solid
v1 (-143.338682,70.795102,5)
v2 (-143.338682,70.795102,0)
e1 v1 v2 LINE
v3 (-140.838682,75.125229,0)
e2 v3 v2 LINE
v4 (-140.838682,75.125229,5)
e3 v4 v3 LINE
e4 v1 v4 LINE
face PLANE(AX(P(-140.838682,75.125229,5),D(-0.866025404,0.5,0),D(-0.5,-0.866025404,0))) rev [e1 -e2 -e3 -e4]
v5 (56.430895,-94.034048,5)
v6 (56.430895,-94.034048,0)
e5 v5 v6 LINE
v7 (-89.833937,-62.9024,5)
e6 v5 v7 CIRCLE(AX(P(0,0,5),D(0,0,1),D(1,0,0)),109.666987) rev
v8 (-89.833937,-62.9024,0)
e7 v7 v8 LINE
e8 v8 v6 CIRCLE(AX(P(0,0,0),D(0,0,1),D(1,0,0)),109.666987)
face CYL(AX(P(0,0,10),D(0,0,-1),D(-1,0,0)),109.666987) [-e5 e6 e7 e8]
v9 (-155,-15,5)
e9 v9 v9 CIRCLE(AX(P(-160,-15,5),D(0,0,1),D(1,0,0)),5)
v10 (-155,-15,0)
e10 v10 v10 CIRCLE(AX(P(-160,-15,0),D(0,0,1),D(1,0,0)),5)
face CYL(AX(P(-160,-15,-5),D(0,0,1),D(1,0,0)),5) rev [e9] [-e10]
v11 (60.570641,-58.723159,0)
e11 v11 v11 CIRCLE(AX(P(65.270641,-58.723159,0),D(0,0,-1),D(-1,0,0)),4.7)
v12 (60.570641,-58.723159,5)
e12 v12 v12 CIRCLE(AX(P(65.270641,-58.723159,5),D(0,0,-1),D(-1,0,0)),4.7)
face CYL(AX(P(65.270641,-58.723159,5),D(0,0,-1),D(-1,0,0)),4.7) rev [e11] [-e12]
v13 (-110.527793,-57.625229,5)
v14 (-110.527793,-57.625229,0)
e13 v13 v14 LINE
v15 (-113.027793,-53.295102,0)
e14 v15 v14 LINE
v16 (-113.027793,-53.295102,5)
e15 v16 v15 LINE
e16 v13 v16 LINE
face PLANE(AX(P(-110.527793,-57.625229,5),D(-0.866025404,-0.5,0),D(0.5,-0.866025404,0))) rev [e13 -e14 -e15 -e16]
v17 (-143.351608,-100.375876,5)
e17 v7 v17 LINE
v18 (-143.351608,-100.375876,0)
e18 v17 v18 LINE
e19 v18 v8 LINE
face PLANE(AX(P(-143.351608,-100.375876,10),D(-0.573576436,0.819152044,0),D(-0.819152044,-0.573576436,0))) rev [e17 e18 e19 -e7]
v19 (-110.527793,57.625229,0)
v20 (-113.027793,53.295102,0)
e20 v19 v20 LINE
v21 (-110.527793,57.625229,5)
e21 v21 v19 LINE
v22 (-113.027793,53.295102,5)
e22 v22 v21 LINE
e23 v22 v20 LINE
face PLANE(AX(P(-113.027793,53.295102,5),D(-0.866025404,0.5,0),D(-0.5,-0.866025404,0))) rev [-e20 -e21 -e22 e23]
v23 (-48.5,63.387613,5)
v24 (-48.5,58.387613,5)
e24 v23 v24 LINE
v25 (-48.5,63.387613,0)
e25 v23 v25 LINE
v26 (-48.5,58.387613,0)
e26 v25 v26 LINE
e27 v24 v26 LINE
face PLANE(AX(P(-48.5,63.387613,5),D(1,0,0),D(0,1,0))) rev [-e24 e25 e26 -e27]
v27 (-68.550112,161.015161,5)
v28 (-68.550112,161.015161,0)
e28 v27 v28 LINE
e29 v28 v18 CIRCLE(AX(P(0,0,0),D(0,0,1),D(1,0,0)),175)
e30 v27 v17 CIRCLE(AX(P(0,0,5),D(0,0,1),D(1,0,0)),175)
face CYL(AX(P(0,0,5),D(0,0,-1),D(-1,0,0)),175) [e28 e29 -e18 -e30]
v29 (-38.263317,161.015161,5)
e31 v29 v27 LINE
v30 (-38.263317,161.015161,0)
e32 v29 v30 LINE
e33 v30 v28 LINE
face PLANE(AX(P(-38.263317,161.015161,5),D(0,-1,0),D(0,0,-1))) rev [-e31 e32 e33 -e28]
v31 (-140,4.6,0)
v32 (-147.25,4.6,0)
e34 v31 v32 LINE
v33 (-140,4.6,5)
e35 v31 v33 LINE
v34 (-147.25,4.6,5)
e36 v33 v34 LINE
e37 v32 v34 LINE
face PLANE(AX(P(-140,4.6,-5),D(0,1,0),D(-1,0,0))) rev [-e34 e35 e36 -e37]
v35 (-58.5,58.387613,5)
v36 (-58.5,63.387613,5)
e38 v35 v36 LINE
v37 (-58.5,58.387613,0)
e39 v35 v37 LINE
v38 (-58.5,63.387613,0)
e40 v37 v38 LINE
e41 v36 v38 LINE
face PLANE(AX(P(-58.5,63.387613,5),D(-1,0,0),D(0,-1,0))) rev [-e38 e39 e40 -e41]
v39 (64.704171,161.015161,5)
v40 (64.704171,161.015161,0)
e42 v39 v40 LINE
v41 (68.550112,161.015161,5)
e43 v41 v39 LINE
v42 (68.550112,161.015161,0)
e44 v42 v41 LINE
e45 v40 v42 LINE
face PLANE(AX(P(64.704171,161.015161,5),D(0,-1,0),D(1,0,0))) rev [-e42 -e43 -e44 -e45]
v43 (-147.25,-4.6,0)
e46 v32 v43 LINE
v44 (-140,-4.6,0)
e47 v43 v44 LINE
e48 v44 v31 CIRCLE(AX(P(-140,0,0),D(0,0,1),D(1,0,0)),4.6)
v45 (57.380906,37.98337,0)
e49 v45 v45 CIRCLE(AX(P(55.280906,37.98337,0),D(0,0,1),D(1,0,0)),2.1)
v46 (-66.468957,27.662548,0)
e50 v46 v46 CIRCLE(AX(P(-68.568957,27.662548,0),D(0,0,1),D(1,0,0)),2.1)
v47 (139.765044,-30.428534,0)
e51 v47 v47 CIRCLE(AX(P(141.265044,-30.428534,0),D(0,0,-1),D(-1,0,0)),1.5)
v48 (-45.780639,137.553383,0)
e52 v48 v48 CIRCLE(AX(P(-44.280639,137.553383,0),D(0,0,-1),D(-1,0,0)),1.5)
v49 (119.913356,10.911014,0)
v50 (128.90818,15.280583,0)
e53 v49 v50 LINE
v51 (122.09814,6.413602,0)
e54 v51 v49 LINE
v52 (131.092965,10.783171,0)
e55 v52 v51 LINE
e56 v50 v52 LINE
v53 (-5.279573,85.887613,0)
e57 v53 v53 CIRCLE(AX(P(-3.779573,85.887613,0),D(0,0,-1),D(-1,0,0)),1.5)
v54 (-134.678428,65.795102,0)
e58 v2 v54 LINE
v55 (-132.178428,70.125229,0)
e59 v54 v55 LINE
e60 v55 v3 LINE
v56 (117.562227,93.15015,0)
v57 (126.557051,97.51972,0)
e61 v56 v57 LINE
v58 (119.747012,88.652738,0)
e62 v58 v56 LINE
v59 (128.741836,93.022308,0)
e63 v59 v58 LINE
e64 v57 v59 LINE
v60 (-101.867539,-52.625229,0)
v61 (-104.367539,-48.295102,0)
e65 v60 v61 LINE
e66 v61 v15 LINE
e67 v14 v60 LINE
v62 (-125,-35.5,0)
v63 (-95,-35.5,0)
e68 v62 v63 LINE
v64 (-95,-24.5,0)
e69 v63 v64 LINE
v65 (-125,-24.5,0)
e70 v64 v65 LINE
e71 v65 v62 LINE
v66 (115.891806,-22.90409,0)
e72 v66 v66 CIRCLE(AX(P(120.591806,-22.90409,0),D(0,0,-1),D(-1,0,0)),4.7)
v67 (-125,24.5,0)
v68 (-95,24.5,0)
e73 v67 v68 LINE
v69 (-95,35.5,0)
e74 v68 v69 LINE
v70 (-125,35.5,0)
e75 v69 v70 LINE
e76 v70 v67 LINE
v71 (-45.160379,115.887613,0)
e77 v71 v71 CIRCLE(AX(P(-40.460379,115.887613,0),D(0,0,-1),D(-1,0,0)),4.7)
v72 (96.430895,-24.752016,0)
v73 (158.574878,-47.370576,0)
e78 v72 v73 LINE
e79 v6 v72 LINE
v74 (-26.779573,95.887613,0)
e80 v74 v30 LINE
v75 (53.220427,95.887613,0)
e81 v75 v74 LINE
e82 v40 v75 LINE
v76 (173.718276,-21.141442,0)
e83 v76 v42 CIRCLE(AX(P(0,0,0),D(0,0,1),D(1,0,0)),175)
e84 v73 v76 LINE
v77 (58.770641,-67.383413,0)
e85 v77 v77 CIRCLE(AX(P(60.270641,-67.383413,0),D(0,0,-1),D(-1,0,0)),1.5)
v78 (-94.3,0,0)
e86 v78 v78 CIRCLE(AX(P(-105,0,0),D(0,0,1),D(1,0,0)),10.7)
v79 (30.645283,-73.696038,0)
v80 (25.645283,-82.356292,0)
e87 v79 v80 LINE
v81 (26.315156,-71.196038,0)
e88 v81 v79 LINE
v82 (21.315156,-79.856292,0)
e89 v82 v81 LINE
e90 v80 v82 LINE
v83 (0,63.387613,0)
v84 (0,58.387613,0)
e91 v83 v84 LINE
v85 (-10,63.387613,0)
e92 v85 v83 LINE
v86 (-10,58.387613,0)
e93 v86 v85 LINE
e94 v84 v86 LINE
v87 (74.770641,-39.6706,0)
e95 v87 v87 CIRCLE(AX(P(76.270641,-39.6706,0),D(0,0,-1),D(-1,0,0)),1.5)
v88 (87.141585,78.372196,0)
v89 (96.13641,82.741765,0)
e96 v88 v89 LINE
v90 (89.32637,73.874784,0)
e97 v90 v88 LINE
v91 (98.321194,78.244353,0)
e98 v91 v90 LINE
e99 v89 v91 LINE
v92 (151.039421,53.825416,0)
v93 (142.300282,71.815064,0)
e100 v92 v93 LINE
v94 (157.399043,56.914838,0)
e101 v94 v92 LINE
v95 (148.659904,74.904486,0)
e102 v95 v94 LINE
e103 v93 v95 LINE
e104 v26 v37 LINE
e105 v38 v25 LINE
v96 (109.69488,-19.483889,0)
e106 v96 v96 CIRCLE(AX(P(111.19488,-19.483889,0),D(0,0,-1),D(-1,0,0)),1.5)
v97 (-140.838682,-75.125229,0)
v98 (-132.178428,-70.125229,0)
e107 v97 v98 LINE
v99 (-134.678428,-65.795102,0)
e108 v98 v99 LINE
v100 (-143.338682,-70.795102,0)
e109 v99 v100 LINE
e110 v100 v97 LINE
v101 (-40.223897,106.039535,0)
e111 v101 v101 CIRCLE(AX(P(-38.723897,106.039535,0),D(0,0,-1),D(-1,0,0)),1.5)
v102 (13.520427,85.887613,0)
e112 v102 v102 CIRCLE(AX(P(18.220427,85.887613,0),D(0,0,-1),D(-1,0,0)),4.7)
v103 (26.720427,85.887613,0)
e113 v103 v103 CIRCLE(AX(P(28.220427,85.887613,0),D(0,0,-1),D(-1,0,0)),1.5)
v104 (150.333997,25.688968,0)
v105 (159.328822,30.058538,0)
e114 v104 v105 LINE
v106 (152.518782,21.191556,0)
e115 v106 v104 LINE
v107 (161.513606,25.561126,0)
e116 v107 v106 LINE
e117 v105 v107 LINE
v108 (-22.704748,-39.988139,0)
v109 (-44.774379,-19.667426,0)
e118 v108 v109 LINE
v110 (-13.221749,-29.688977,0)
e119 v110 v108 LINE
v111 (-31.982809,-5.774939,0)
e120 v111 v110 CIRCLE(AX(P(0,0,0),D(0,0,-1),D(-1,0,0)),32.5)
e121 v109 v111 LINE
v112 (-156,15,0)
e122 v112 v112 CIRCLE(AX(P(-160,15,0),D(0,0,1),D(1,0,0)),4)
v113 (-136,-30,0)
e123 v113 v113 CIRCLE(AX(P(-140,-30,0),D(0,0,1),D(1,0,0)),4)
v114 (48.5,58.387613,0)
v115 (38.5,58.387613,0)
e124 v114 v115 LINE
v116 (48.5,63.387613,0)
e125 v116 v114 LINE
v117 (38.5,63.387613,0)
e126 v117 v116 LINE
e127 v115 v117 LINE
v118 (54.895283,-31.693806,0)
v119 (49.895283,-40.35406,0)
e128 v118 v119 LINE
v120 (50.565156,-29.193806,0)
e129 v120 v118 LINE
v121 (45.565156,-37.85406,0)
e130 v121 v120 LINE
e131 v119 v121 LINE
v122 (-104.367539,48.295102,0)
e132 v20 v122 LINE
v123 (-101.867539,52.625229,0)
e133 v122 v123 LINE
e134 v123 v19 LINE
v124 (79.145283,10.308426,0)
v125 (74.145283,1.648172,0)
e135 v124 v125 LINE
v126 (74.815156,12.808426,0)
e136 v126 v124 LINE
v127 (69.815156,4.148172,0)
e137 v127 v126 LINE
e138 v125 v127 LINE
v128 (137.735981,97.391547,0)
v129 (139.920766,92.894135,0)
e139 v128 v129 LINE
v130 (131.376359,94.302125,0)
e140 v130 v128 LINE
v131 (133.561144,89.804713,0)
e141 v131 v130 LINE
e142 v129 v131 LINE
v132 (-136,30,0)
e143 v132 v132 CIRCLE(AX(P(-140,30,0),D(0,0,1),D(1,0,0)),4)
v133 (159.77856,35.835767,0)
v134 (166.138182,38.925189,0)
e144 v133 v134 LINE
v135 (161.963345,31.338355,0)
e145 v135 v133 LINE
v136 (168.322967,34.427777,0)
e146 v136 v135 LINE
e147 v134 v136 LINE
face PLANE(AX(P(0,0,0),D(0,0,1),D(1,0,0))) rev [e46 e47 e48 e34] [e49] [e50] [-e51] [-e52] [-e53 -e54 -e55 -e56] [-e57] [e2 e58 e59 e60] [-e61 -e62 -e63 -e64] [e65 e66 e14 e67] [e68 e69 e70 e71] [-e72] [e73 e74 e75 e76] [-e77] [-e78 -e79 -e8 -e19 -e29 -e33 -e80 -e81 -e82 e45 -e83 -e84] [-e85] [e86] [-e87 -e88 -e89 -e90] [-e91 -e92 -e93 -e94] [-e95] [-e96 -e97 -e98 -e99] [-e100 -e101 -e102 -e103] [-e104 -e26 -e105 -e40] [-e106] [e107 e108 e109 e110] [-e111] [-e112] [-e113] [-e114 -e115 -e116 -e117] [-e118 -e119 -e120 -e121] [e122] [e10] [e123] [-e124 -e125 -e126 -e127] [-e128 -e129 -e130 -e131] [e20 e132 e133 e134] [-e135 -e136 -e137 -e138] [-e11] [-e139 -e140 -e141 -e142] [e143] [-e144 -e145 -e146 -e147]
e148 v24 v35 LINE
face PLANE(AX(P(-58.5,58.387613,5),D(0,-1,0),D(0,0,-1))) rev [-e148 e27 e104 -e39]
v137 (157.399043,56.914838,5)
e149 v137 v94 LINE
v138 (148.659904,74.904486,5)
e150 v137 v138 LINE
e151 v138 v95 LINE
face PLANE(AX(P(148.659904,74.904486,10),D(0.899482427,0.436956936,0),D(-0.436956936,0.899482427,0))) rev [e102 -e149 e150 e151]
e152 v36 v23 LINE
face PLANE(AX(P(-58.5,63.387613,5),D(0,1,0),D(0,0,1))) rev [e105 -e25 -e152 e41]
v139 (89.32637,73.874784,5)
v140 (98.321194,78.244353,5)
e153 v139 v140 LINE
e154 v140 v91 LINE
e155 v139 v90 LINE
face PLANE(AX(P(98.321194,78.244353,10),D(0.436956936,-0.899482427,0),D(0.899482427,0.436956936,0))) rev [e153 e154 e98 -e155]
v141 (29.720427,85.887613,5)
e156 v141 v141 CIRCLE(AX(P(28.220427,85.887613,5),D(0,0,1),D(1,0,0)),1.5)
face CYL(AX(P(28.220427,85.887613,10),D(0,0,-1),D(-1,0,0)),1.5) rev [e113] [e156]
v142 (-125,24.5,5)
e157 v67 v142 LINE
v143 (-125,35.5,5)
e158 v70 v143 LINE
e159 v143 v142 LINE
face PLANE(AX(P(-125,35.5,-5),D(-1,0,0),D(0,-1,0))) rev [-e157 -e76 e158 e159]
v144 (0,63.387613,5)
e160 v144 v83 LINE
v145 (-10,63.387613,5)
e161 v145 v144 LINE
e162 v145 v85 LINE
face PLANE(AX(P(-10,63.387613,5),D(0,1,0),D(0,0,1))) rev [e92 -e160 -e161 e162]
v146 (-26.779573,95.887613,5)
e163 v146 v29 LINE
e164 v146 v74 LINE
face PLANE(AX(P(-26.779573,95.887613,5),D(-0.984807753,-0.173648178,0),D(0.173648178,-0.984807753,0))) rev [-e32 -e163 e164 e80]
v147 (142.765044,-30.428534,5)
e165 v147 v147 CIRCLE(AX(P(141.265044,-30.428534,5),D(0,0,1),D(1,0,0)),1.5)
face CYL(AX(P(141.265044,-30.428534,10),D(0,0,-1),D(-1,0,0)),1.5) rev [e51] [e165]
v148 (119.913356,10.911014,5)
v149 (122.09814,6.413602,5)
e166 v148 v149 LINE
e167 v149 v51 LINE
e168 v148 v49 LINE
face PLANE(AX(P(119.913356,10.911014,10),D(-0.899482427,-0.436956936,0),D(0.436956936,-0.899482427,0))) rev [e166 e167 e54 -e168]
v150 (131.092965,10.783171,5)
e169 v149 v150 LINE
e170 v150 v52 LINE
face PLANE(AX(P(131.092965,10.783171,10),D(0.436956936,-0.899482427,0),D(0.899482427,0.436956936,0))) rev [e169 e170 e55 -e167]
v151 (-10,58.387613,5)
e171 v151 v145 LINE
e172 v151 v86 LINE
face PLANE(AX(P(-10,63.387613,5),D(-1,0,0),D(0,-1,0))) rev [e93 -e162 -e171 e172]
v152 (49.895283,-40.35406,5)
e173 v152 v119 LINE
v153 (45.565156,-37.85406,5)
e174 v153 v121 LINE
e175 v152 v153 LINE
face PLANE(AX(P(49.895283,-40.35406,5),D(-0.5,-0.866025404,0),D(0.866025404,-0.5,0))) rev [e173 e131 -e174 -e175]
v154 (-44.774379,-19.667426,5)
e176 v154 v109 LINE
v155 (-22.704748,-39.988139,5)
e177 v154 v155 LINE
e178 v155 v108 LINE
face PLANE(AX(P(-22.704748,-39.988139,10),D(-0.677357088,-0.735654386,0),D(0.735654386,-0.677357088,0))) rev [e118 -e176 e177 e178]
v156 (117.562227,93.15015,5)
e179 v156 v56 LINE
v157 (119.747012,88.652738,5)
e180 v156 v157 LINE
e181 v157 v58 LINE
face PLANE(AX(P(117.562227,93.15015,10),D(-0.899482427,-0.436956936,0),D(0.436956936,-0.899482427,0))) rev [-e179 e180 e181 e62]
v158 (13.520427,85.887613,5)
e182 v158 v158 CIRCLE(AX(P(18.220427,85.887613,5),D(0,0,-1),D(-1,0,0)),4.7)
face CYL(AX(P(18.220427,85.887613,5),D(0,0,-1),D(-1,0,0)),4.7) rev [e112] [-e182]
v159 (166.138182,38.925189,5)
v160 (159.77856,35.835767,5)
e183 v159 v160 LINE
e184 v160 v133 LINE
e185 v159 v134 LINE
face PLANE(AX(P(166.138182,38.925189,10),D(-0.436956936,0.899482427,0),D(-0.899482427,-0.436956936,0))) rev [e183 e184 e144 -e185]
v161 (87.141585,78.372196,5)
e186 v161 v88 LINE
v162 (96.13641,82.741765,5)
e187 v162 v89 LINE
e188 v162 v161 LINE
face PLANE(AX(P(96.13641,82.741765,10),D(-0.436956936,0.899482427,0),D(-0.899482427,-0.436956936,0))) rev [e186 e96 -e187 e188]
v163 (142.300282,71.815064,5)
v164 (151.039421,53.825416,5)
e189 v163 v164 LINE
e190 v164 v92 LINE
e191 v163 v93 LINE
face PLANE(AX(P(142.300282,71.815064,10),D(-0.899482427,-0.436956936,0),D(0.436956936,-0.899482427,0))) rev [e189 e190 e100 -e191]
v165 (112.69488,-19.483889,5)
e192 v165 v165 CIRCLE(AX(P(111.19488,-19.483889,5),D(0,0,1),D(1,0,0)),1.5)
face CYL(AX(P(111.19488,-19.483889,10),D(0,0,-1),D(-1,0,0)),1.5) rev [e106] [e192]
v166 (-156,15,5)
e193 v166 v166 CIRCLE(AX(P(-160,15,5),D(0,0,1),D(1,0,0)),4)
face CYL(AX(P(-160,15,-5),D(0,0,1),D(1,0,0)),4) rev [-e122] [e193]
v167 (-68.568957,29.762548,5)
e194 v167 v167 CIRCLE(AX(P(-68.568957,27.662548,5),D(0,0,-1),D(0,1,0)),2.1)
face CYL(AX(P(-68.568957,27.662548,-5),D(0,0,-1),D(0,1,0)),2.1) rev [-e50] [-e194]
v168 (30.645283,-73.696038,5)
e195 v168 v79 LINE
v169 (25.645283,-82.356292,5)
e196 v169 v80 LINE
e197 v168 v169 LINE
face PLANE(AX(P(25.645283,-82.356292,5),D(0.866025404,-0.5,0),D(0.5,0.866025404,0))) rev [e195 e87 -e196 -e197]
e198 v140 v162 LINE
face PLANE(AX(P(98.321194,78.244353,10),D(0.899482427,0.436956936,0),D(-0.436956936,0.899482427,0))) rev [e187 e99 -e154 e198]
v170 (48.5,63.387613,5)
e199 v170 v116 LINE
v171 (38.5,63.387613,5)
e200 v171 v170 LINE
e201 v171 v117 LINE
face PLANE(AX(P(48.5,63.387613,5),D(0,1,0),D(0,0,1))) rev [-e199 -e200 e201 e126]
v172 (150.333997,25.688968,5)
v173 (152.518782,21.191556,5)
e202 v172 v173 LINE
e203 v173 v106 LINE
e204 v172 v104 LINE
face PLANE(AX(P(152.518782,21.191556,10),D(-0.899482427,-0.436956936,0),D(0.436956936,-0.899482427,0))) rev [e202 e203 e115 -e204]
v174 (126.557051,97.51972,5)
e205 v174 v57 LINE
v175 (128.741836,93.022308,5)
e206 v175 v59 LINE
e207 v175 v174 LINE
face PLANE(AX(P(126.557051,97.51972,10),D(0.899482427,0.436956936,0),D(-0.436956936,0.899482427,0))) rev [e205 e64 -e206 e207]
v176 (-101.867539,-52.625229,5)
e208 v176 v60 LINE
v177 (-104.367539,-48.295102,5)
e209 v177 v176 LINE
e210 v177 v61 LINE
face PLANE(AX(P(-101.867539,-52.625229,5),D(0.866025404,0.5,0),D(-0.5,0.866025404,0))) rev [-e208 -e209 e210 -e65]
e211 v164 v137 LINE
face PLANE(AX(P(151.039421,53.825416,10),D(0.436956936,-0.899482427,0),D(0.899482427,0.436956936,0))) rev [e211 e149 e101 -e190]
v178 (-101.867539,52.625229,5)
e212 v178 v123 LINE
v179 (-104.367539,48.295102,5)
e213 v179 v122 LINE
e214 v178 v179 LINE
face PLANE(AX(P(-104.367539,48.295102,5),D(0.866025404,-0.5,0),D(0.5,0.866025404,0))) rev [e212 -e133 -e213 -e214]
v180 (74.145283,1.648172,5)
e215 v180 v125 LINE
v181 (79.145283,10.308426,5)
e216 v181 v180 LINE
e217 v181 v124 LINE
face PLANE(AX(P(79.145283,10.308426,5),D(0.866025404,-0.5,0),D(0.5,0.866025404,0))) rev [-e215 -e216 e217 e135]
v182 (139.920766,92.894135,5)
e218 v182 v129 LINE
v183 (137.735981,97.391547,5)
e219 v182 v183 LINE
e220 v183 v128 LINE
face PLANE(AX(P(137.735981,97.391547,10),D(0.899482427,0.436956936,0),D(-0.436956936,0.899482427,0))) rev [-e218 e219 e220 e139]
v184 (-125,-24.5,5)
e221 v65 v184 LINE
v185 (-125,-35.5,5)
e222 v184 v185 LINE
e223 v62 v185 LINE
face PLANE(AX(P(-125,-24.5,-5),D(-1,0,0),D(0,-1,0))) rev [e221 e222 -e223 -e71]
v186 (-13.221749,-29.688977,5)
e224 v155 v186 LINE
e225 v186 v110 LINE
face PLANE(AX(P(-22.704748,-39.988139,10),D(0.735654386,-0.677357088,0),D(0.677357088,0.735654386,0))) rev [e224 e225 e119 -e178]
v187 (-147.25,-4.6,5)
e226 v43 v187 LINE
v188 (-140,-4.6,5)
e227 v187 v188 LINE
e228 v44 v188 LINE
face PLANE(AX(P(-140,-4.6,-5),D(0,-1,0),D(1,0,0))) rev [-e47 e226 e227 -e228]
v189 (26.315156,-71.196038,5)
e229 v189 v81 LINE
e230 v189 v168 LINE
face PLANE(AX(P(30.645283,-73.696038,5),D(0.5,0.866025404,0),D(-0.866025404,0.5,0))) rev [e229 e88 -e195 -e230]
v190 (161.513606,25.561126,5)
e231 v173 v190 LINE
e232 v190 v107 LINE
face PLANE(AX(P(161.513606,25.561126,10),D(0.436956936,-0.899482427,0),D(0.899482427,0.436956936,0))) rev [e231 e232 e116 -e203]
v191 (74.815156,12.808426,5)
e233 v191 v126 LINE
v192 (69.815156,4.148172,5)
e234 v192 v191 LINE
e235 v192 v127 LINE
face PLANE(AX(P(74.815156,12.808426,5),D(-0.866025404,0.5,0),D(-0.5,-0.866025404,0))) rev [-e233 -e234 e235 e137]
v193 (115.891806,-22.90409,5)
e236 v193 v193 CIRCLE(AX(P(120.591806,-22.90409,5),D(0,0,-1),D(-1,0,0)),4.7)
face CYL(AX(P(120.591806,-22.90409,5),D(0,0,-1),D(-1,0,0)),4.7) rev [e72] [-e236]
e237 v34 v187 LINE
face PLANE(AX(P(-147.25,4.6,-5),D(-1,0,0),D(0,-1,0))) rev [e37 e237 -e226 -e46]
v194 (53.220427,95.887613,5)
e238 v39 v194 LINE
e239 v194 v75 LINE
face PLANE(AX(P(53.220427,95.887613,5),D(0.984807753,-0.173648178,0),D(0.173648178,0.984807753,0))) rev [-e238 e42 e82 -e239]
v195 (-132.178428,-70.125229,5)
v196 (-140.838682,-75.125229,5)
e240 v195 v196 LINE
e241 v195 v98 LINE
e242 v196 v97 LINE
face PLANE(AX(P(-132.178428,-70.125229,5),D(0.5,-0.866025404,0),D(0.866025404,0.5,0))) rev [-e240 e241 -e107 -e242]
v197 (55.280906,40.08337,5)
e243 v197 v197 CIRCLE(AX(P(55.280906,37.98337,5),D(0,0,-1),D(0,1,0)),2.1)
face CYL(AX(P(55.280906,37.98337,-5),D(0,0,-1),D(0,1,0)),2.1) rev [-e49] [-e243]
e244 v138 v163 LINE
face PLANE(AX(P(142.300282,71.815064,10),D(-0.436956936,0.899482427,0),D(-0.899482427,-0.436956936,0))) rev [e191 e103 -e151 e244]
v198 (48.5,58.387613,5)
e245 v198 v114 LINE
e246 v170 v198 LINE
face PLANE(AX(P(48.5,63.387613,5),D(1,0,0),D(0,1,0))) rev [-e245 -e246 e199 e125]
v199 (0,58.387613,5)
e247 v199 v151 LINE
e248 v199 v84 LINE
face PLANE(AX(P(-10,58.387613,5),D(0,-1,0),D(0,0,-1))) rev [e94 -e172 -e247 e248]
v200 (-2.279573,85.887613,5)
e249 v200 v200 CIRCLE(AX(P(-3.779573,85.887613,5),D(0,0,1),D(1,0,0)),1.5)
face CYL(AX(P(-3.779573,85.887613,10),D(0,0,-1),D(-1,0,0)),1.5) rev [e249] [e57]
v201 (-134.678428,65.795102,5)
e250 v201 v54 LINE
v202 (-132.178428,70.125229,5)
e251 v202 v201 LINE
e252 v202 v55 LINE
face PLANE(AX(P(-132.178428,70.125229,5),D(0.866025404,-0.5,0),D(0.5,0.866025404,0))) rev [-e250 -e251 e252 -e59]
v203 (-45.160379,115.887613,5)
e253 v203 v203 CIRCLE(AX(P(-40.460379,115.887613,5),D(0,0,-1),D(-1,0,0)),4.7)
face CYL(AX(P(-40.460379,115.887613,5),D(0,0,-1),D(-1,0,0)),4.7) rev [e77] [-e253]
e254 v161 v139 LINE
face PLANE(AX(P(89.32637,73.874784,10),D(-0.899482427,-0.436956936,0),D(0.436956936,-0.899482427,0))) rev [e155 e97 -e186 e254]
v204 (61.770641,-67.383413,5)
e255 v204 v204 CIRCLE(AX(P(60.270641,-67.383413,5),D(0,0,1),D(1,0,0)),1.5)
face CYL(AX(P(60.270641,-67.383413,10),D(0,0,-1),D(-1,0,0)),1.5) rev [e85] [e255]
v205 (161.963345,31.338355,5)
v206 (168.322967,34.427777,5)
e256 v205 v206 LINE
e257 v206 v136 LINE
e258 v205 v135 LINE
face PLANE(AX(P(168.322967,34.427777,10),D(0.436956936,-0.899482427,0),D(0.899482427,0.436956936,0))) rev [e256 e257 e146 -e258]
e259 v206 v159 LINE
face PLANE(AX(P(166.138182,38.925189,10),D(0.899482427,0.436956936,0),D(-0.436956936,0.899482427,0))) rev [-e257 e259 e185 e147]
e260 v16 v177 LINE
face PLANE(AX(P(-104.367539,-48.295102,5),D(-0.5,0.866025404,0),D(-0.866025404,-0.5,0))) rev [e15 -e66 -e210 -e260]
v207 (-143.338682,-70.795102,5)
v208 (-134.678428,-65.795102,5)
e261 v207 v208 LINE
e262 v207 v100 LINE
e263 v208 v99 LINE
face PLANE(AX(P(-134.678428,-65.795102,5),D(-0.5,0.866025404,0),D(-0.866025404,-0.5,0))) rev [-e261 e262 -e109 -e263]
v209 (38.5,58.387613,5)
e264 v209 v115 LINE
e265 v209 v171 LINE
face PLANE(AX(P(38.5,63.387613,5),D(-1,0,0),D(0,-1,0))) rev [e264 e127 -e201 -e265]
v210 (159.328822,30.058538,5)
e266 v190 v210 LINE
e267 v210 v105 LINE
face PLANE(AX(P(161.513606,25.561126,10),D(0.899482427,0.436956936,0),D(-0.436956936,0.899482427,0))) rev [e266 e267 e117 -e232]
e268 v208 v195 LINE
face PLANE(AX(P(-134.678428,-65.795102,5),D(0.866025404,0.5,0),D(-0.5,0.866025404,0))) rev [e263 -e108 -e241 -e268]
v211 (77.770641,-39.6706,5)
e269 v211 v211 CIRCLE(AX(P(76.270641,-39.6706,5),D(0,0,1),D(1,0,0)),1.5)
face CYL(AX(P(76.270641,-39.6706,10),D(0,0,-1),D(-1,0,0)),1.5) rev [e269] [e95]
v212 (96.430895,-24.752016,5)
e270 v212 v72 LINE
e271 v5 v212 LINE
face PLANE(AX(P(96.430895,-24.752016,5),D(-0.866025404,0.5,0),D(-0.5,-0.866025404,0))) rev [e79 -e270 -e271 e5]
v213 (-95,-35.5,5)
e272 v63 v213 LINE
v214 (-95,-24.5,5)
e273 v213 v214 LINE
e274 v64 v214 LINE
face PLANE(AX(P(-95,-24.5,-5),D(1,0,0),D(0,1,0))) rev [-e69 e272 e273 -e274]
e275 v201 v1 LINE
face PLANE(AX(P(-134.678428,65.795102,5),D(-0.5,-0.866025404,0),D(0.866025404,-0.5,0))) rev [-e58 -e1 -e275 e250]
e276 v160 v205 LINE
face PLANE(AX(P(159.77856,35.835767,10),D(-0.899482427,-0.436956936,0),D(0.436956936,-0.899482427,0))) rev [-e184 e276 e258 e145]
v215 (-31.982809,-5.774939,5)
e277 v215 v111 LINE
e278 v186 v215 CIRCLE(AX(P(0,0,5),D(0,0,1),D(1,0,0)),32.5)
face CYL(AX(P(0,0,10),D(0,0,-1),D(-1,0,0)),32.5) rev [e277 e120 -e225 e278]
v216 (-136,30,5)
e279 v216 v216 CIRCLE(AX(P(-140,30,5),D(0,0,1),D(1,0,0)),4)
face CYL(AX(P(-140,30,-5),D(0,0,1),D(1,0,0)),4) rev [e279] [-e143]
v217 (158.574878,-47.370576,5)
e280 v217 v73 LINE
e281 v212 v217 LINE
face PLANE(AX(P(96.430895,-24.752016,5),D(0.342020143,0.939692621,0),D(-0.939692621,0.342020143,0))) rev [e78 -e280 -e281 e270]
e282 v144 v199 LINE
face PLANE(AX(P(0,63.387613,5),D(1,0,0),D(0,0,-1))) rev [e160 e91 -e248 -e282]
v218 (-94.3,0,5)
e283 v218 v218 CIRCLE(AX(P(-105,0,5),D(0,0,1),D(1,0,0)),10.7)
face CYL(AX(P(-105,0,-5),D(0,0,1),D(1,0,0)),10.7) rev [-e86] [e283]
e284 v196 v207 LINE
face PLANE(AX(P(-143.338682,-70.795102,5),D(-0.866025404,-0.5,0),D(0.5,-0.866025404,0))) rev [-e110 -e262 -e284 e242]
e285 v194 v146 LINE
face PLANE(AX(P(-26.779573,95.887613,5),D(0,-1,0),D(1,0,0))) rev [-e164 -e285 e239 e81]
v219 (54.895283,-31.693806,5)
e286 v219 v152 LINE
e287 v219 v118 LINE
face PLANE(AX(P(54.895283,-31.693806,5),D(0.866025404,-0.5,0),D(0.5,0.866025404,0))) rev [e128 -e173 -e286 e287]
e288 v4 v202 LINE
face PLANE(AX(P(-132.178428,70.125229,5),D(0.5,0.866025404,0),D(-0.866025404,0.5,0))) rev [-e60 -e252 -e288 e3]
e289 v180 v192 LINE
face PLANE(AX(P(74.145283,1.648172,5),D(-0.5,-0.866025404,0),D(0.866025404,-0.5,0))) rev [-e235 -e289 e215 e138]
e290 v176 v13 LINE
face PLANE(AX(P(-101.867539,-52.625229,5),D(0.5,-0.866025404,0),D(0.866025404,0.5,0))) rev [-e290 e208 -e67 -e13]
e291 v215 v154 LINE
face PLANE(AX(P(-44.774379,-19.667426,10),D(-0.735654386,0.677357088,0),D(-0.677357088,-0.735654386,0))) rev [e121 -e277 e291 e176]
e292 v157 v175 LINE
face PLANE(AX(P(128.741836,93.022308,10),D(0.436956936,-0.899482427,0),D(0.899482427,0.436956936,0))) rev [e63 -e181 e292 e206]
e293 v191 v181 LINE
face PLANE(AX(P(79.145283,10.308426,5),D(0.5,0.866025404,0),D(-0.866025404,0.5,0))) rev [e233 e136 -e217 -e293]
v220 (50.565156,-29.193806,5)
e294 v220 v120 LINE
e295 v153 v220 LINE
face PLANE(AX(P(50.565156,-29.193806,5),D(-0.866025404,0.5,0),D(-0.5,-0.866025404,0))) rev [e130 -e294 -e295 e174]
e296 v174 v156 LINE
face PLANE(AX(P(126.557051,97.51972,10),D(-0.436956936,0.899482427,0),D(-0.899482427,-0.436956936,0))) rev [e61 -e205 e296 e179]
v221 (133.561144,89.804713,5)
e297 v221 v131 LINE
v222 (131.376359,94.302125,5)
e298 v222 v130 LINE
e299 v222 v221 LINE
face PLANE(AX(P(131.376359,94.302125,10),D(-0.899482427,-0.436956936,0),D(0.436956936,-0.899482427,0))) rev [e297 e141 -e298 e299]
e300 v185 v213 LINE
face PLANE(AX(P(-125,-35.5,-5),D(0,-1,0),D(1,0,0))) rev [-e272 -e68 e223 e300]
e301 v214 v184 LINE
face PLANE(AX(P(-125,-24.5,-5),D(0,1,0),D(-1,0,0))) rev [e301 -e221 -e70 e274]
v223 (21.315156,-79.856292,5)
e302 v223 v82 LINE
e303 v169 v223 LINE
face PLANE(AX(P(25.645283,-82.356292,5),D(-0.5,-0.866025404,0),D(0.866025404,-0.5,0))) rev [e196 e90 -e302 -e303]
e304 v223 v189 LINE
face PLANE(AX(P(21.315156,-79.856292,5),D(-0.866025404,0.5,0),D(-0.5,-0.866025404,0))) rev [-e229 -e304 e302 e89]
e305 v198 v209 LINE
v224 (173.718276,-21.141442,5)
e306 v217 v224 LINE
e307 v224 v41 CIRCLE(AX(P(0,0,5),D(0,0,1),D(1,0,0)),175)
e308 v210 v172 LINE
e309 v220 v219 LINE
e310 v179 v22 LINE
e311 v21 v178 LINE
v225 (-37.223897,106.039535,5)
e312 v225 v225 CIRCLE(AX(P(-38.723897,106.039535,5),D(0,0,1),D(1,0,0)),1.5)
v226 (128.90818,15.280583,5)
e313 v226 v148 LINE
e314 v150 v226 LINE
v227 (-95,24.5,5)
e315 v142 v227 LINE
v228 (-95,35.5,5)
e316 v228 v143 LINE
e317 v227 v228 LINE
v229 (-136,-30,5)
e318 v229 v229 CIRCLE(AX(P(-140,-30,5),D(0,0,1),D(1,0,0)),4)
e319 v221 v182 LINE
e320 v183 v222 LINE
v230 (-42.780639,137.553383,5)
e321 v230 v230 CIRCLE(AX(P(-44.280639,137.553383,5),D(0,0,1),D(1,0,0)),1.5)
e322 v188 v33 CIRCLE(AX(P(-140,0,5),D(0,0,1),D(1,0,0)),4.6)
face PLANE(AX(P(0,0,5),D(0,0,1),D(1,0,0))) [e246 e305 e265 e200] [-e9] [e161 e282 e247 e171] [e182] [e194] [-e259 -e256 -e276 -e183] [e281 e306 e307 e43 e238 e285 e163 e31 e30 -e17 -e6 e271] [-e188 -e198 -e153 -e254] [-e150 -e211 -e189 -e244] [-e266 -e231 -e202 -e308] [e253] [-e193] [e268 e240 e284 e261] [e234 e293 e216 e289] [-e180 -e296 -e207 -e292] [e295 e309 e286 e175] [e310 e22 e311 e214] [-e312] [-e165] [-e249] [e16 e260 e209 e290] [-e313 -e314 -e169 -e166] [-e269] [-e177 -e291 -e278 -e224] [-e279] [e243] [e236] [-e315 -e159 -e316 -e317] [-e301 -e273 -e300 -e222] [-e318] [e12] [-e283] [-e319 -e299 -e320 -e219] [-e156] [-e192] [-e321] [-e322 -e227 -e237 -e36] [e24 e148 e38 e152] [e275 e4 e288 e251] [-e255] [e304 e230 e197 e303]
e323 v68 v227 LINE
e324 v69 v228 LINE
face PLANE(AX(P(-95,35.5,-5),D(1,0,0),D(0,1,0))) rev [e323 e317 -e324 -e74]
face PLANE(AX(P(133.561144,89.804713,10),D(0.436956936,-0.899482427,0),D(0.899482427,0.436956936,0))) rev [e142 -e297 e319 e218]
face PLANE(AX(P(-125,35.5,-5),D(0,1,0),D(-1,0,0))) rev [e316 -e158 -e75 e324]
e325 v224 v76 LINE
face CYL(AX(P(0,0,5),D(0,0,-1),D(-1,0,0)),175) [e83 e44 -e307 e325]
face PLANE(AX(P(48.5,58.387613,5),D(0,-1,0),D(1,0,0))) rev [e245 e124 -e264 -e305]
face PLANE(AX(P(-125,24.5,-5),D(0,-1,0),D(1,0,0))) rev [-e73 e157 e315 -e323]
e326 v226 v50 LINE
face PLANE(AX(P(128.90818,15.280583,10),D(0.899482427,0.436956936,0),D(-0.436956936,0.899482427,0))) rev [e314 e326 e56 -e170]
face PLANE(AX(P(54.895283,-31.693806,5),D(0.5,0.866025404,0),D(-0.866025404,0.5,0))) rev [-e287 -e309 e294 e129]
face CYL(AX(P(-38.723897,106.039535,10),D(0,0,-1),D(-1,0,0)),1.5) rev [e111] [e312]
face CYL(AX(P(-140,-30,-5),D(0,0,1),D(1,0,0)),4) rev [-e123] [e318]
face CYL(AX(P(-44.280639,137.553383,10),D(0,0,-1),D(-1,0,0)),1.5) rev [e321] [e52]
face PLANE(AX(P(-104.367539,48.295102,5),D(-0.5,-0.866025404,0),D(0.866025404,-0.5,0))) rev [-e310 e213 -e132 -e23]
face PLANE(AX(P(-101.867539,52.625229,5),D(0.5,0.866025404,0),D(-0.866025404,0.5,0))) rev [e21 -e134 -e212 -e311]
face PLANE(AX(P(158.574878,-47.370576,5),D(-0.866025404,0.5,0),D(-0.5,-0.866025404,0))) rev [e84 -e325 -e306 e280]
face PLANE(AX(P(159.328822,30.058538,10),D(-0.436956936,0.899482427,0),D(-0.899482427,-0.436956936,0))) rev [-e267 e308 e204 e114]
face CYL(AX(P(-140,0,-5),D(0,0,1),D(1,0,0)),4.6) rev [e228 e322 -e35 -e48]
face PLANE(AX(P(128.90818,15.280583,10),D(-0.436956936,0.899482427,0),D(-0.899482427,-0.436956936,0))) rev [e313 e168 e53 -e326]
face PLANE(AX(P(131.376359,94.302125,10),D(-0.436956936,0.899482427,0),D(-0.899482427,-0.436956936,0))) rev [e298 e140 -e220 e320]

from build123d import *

# Parameters (mm, degrees)
ESQUISSE1_R                   = 175
BOSS_EXTRU_1_DEPTH            = 5
ESQUISSE2_R                   = 4.7
ENL_V_MAT_EXTRU_1_DEPTH       = 5
LEDS_BOUT_TIRETTE_R           = 10.7
LEDS_BOUT_TIRETTE_R_2         = 4
LEDS_BOUT_TIRETTE_R_3         = 5
LEDS_BOUT_TIRETTE_W           = 30
LEDS_BOUT_TIRETTE_H           = 11
LEDS_BUTTONS_DEPTH            = 10
FIXATION_ACENSSEURS_R         = 1.5
ENL_V_MAT_EXTRU_2_DEPTH       = 10
ENL_V_MAT_EXTRU_3_DEPTH       = 10
ENL_V_MAT_EXTRU_4_DEPTH       = 10
ENL_V_START                   = -2.417292656
ENL_V_MAT_EXTRU_5_OUTLINE_W   = 7.070312755
ENL_V_MAT_EXTRU_5_OUTLINE_H   = 5
ENL_V_MAT_EXTRU_5_DEPTH       = 20
ENL_V_START_2                 = -32.417292656
ENL_V_MAT_EXTRU_5_2_OUTLINE_W = 10
ENL_V_MAT_EXTRU_5_2_OUTLINE_H = 5
ENL_V_MAT_EXTRU_5_2_DEPTH     = 5
ENL_V_START_3                 = 42.582707344
ENL_V_MAT_EXTRU_5_3_OUTLINE_W = 10
ENL_V_MAT_EXTRU_5_3_OUTLINE_H = 5
ENL_V_MAT_EXTRU_5_3_DEPTH     = 5
ENL_V_START_4                 = -27.417292656
ENL_V_MAT_EXTRU_5_4_OUTLINE_W = 7.070312755
ENL_V_MAT_EXTRU_5_4_OUTLINE_H = 5
ENL_V_MAT_EXTRU_5_4_DEPTH     = 5
ENL_V_START_5                 = 37.582707344
ENL_V_MAT_EXTRU_5_5_OUTLINE_W = 7.070312755
ENL_V_MAT_EXTRU_5_5_OUTLINE_H = 5
ENL_V_MAT_EXTRU_5_5_DEPTH     = 5
ESQUISSE8_W                   = 10
ESQUISSE8_H                   = 5
ENL_V_MAT_EXTRU_6_DEPTH       = 5
ENL_V_MAT_EXTRU_7_DEPTH       = 10
TROU_TARAUD_M51_D             = 4.2


# Read off the part's stored shape, not the designer's step: Enlèv. mat.-Extru.5
with BuildPart() as part:
    # Esquisse1 → Boss.-Extru.1 (new body)
    with BuildSketch(Plane.XY):
        Circle(ESQUISSE1_R)
    extrude(amount=BOSS_EXTRU_1_DEPTH)

    # Esquisse2 → Enlèv. mat.-Extru.1 (cut)
    with BuildSketch(Plane(origin=(0, 0, 0), x_dir=(-1, 0, 0), z_dir=(0, 0, -1))):
        with Locations((-18.220426897, 85.887612711)):
            Circle(ESQUISSE2_R)
        with Locations((40.460378836, 115.887612711)):
            Circle(ESQUISSE2_R)
        with Locations((-65.270641029, -58.723158916)):
            Circle(ESQUISSE2_R)
        with Locations((-120.59180601, -22.904090436)):
            Circle(ESQUISSE2_R)
        Polygon((26.7795731, 95.88761271), (38.263317053, 161.015161015), (68.550112498, 161.015161015), (68.550112498, 190.246123658), (-94.990966298, 190.246123658), (-94.990966298, 161.015161015), (-64.704170853, 161.015161015), (-53.2204269, 95.88761271), align=None)
        Polygon((-96.430895065, -24.752015748), (-158.57487836, -47.370575906), (-173.718276082, -21.141441652), (-199.033032308, -35.756922974), (-117.262492911, -177.387651773), (-91.947736684, -162.772170451), (-107.091134406, -136.543036197), (-56.430895065, -94.034048051), align=None)
    extrude(amount=-ENL_V_MAT_EXTRU_1_DEPTH, mode=Mode.SUBTRACT)

    # Leds, bout., tirette → Leds, buttons (cut)
    with BuildSketch(Plane.XY.offset(5)):
        with Locations((-105, 0)):
            Circle(LEDS_BOUT_TIRETTE_R)
        with Locations((-140, 30)):
            Circle(LEDS_BOUT_TIRETTE_R_2)
        with Locations((-140, -30)):
            Circle(LEDS_BOUT_TIRETTE_R_2)
        with Locations((-160, 15)):
            Circle(LEDS_BOUT_TIRETTE_R_2)
        with Locations((-160, -15)):
            Circle(LEDS_BOUT_TIRETTE_R_3)
        with BuildLine():
            Line((-140, -4.6), (-147.25, -4.6))
            Line((-147.25, -4.6), (-147.25, 4.6))
            Line((-147.25, 4.6), (-140, 4.6))
            ThreePointArc((-140, 4.6), (-135.4, 0), (-140, -4.6))
        make_face()
        with Locations((-110, 30)):
            Rectangle(LEDS_BOUT_TIRETTE_W, LEDS_BOUT_TIRETTE_H)
        with Locations((-110, -30)):
            Rectangle(LEDS_BOUT_TIRETTE_W, LEDS_BOUT_TIRETTE_H)
    extrude(amount=-LEDS_BUTTONS_DEPTH, mode=Mode.SUBTRACT)

    # Fixation acensseurs → Enlèv. mat.-Extru.2 (cut)
    with BuildSketch(Plane(origin=(0, 0, 0), x_dir=(-1, 0, 0), z_dir=(0, 0, -1))):
        with Locations((38.72389706, 106.03953518)):
            Circle(FIXATION_ACENSSEURS_R)
        with Locations((-28.220426897, 85.887612711)):
            Circle(FIXATION_ACENSSEURS_R)
        with Locations((44.280638745, 137.553383277)):
            Circle(FIXATION_ACENSSEURS_R)
        with Locations((3.779573103, 85.887612711)):
            Circle(FIXATION_ACENSSEURS_R)
        with Locations((-111.194879802, -19.483889003)):
            Circle(FIXATION_ACENSSEURS_R)
        with Locations((-60.270641029, -67.383412953)):
            Circle(FIXATION_ACENSSEURS_R)
        with Locations((-141.265043667, -30.428533589)):
            Circle(FIXATION_ACENSSEURS_R)
        with Locations((-76.270641029, -39.670600032)):
            Circle(FIXATION_ACENSSEURS_R)
    extrude(amount=-ENL_V_MAT_EXTRU_2_DEPTH, mode=Mode.SUBTRACT)

    # Esquisse3 → Enlèv. mat.-Extru.3 (cut)
    with BuildSketch(Plane(origin=(0, 0, 0), x_dir=(-1, 0, 0), z_dir=(0, 0, -1))):
        with BuildLine():
            Line((22.704747883, -39.988138527), (44.77437947, -19.667425901))
            Line((44.77437947, -19.667425901), (31.982809207, -5.77493855))
            ThreePointArc((31.982809207, -5.77493855), (-25.570164707, 20.060325942), (13.221748658, -29.68897712))
            Line((13.221748658, -29.68897712), (22.704747883, -39.988138527))
        make_face()
    extrude(amount=-ENL_V_MAT_EXTRU_3_DEPTH, mode=Mode.SUBTRACT)

    # Esquisse4 → Enlèv. mat.-Extru.4 (cut)
    with BuildSketch(Plane(origin=(0, 0, -5), x_dir=(-1, 0, 0), z_dir=(0, 0, -1))):
        Polygon((134.678427666, -65.79510224), (143.338681704, -70.79510224), (140.838681704, -75.125229259), (132.178427666, -70.125229259), align=None)
        Polygon((101.867538534, -52.625229259), (110.527792572, -57.625229259), (113.027792572, -53.29510224), (104.367538534, -48.29510224), align=None)
        Polygon((104.367538534, 48.29510224), (101.867538534, 52.625229259), (110.527792572, 57.625229259), (113.027792572, 53.29510224), align=None)
        Polygon((132.178427666, 70.125229259), (134.678427666, 65.79510224), (143.338681704, 70.79510224), (140.838681704, 75.125229259), align=None)
    extrude(amount=-ENL_V_MAT_EXTRU_4_DEPTH, mode=Mode.SUBTRACT)

    # Enlèv. mat.-Extru.5 outline → Enlèv. mat.-Extru.5 (cut)
    with BuildSketch(Plane(origin=(0, 0, 0), x_dir=(0.899482426544107, 0.4369569364803871, 0), z_dir=(0.4369569364803871, -0.8994824265441071, 0)).offset(ENL_V_START)):
        with Locations((162.91185011, 2.5)):
            Rectangle(ENL_V_MAT_EXTRU_5_OUTLINE_W, ENL_V_MAT_EXTRU_5_OUTLINE_H)
    extrude(amount=ENL_V_MAT_EXTRU_5_DEPTH, mode=Mode.SUBTRACT)

    # Enl_v. mat.-Extru.5 2 outline → Enl_v. mat.-Extru.5 2 (cut)
    with BuildSketch(Plane(origin=(0, 0, 0), x_dir=(0.899482426544107, 0.4369569364803871, 0), z_dir=(0.4369569364803871, -0.8994824265441071, 0)).offset(ENL_V_START_2)):
        with Locations((117.627599257, 2.5)):
            Rectangle(ENL_V_MAT_EXTRU_5_2_OUTLINE_W, ENL_V_MAT_EXTRU_5_2_OUTLINE_H)
        with Locations((151.447761545, 2.5)):
            Rectangle(ENL_V_MAT_EXTRU_5_2_OUTLINE_W, ENL_V_MAT_EXTRU_5_2_OUTLINE_H)
    extrude(amount=ENL_V_MAT_EXTRU_5_2_DEPTH, mode=Mode.SUBTRACT)

    # Enl_v. mat.-Extru.5 3 outline → Enl_v. mat.-Extru.5 3 (cut)
    with BuildSketch(Plane(origin=(0, 0, 0), x_dir=(0.899482426544107, 0.4369569364803871, 0), z_dir=(0.4369569364803871, -0.8994824265441071, 0)).offset(ENL_V_START_3)):
        with Locations((117.627599257, 2.5)):
            Rectangle(ENL_V_MAT_EXTRU_5_3_OUTLINE_W, ENL_V_MAT_EXTRU_5_3_OUTLINE_H)
        with Locations((151.447761545, 2.5)):
            Rectangle(ENL_V_MAT_EXTRU_5_3_OUTLINE_W, ENL_V_MAT_EXTRU_5_3_OUTLINE_H)
    extrude(amount=ENL_V_MAT_EXTRU_5_3_DEPTH, mode=Mode.SUBTRACT)

    # Enl_v. mat.-Extru.5 4 outline → Enl_v. mat.-Extru.5 4 (cut)
    with BuildSketch(Plane(origin=(0, 0, 0), x_dir=(0.899482426544107, 0.4369569364803871, 0), z_dir=(0.4369569364803871, -0.8994824265441071, 0)).offset(ENL_V_START_4)):
        with Locations((162.91185011, 2.5)):
            Rectangle(ENL_V_MAT_EXTRU_5_4_OUTLINE_W, ENL_V_MAT_EXTRU_5_4_OUTLINE_H)
    extrude(amount=ENL_V_MAT_EXTRU_5_4_DEPTH, mode=Mode.SUBTRACT)

    # Enl_v. mat.-Extru.5 5 outline → Enl_v. mat.-Extru.5 5 (cut)
    with BuildSketch(Plane(origin=(0, 0, 0), x_dir=(0.899482426544107, 0.4369569364803871, 0), z_dir=(0.4369569364803871, -0.8994824265441071, 0)).offset(ENL_V_START_5)):
        with Locations((162.91185011, 2.5)):
            Rectangle(ENL_V_MAT_EXTRU_5_5_OUTLINE_W, ENL_V_MAT_EXTRU_5_5_OUTLINE_H)
    extrude(amount=ENL_V_MAT_EXTRU_5_5_DEPTH, mode=Mode.SUBTRACT)

    # Esquisse8 → Enlèv. mat.-Extru.6 (cut)
    with BuildSketch(Plane(origin=(0, 0, 0), x_dir=(-1, 0, 0), z_dir=(0, 0, -1))):
        with Locations((53.5, 60.88761271)):
            Rectangle(ESQUISSE8_W, ESQUISSE8_H)
        with Locations((5, 60.88761271)):
            Rectangle(ESQUISSE8_W, ESQUISSE8_H)
        with Locations((-43.5, 60.88761271)):
            Rectangle(ESQUISSE8_W, ESQUISSE8_H)
        Polygon((-79.145282892, 10.308425729), (-74.145282892, 1.648171691), (-69.815155873, 4.148171691), (-74.815155873, 12.808425729), align=None)
        Polygon((-54.895282892, -31.693806355), (-49.895282892, -40.354060393), (-45.565155873, -37.854060393), (-50.565155873, -29.193806355), align=None)
        Polygon((-21.315155873, -79.856292476), (-26.315155873, -71.196038439), (-30.645282892, -73.696038439), (-25.645282892, -82.356292476), align=None)
    extrude(amount=-ENL_V_MAT_EXTRU_6_DEPTH, mode=Mode.SUBTRACT)

    # Esquisse9 → Enlèv. mat.-Extru.7 (cut)
    with BuildSketch(Plane(origin=(0, 0, 0), x_dir=(-1, 0, 0), z_dir=(0, 0, -1))):
        with BuildLine():
            Line((143.351607751, -100.375876361), (89.833936865, -62.90239978))
            ThreePointArc((89.833936865, -62.90239978), (22.830586532, -107.264217842), (-56.430895065, -94.034048051))
            Line((-56.430895065, -94.034048051), (-107.091134406, -136.543036197))
            Line((-107.091134406, -136.543036197), (-105.168163584, -139.873719363))
            ThreePointArc((-105.168163584, -139.873719363), (38.840643584, -244.384683529), (143.351607751, -100.375876361))
        make_face()
    extrude(amount=-ENL_V_MAT_EXTRU_7_DEPTH, mode=Mode.SUBTRACT)

    # Trou taraudé M51 (through all)
    with Locations(Plane(origin=(0, 0, -5), x_dir=(1, 0, 0), z_dir=(0, 0, -1))):
        with Locations((-68.568956805, -27.662548456), (55.280905682, -37.98337033), (-87.299337242, 135.559338217)):
            Hole(TROU_TARAUD_M51_D / 2)


solid = part.part
